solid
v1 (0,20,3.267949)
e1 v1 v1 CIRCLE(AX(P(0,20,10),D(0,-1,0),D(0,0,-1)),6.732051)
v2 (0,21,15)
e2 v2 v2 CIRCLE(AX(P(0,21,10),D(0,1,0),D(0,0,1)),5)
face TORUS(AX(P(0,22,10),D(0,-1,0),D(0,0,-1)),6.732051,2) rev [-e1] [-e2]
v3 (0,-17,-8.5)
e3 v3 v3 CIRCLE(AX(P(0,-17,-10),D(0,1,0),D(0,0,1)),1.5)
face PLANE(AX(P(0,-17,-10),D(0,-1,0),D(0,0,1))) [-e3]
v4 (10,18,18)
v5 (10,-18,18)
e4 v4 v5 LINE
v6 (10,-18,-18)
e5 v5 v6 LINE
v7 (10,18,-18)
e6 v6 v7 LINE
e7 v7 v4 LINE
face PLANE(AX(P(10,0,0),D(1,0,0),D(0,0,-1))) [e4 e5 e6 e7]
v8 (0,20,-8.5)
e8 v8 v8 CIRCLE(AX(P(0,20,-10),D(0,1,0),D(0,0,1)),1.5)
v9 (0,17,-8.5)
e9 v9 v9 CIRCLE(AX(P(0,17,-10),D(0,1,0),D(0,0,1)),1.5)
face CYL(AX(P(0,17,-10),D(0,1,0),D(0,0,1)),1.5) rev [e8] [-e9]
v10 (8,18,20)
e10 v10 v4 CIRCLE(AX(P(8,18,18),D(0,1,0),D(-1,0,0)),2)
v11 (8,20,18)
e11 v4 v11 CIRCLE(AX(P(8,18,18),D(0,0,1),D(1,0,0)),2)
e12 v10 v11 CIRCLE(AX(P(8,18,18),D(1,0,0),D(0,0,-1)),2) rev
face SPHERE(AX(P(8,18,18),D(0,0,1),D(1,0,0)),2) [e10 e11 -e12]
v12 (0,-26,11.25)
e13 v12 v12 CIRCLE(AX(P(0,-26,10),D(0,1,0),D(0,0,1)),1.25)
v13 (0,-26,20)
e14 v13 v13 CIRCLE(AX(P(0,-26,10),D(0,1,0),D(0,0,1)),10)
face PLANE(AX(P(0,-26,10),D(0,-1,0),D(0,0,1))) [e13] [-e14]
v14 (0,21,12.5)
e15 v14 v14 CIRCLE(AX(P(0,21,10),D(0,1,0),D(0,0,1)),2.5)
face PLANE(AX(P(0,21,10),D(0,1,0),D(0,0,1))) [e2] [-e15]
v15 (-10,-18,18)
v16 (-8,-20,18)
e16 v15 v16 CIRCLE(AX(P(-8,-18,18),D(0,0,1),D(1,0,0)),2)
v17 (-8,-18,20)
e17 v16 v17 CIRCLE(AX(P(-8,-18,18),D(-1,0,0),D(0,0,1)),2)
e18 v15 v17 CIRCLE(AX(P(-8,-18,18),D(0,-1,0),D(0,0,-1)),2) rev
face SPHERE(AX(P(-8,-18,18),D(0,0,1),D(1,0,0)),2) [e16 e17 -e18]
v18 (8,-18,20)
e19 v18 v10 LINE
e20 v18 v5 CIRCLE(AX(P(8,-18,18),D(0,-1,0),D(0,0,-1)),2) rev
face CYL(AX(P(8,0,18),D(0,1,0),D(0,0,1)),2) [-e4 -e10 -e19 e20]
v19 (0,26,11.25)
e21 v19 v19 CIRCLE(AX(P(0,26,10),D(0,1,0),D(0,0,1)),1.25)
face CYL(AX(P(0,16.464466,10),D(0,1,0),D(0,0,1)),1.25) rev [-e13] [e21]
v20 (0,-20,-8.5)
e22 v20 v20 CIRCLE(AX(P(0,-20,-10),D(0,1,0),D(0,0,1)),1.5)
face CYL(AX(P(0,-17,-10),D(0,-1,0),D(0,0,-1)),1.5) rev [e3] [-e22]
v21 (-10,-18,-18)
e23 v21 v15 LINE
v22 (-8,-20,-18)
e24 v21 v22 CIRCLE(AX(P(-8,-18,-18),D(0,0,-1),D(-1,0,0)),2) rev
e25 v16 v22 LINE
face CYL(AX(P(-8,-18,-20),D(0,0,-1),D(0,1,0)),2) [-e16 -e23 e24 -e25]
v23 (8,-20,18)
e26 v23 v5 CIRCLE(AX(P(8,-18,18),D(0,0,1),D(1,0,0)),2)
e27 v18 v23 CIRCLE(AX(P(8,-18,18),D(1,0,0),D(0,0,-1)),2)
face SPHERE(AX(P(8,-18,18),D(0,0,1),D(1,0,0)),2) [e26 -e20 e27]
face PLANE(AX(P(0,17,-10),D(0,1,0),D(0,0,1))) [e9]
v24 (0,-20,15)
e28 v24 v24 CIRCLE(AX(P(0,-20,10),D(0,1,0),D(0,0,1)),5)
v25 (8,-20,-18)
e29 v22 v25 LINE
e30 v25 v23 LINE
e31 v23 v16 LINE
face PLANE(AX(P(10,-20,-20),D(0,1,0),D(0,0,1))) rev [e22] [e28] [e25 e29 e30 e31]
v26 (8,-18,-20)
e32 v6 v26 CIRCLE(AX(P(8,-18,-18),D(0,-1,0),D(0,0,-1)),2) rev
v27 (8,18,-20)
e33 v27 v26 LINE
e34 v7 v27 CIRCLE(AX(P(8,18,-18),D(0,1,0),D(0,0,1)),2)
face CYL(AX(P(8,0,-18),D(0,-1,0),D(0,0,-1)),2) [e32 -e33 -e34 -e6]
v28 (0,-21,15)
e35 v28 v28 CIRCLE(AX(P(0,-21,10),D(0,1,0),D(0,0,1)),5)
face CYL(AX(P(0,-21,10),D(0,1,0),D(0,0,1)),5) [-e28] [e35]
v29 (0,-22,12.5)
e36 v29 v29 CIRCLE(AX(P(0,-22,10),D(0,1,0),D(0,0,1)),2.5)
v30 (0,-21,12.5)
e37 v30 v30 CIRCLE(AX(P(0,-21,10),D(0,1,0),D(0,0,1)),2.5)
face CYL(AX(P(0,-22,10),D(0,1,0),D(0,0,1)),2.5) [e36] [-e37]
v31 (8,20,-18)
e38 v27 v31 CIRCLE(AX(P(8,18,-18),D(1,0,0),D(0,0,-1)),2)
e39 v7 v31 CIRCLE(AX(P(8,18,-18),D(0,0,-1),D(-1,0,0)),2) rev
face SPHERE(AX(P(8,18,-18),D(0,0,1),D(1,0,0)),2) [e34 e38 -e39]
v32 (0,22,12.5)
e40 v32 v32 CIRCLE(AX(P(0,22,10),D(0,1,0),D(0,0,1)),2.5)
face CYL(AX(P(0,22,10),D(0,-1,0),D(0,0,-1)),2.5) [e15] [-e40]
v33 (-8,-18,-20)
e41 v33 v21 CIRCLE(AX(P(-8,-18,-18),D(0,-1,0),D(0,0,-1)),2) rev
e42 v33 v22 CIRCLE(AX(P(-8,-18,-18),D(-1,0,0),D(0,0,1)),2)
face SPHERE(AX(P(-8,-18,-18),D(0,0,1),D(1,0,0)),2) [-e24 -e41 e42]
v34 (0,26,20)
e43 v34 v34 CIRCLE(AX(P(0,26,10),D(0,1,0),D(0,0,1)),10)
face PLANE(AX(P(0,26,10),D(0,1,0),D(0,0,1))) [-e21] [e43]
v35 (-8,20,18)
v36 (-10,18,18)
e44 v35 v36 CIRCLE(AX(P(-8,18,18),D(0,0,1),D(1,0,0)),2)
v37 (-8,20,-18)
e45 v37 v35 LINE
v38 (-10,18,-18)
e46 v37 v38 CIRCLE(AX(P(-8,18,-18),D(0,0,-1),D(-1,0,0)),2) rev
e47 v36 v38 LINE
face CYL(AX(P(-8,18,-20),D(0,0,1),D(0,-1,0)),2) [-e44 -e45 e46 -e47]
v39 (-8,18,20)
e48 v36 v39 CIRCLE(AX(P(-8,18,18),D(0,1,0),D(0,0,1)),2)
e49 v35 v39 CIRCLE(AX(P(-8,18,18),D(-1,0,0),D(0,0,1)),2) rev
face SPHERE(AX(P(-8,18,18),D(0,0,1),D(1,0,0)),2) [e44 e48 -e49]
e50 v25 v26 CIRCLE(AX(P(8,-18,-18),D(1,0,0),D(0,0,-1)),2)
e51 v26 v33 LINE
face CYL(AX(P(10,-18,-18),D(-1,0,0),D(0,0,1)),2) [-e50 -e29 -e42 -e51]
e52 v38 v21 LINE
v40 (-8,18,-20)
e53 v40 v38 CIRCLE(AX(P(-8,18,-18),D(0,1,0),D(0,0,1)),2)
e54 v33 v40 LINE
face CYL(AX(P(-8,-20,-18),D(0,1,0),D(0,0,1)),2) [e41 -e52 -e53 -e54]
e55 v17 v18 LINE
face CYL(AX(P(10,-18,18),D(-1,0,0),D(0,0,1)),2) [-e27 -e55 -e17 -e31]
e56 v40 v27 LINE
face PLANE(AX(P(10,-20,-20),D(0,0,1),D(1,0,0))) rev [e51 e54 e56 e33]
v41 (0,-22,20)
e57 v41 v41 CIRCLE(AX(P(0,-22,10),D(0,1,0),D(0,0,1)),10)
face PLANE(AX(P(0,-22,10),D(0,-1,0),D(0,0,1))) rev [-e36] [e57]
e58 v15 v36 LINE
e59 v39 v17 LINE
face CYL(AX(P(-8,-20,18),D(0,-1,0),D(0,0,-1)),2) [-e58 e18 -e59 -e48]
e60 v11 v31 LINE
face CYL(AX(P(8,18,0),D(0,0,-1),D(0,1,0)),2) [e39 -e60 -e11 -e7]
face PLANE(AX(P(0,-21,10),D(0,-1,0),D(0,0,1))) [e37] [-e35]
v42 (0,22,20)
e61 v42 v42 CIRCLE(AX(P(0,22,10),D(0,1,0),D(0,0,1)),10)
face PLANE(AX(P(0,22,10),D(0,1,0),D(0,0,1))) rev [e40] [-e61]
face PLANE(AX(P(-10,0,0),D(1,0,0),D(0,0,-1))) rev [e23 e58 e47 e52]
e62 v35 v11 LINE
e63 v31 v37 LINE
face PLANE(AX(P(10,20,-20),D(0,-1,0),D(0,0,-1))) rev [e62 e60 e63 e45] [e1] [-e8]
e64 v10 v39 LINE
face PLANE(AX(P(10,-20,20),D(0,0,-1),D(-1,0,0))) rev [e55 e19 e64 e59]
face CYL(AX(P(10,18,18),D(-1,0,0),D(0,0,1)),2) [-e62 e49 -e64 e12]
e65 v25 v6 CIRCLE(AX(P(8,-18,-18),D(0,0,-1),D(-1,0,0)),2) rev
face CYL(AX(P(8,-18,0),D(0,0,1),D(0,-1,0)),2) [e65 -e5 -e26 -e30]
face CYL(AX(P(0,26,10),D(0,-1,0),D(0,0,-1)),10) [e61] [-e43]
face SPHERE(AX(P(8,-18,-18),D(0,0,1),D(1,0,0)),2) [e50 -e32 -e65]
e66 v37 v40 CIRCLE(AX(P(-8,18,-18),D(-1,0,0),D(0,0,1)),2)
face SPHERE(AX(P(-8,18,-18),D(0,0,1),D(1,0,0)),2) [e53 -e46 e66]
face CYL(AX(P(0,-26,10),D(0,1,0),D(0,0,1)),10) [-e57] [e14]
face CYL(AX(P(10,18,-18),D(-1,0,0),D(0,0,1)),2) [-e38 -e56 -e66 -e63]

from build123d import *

# Parameters (mm, degrees)
SKETCH_1_W          = 40
SKETCH_1_H          = 40
EXTRUDE_1_DEPTH     = 10
SKETCH_2_R          = 5
EXTRUDE_2_DEPTH     = 1
SKETCH_3_R          = 2.5
EXTRUDE_3_DEPTH     = 1
SKETCH_4_R          = 10
EXTRUDE_4_DEPTH     = 4
CUT_EXTRUDE_START   = -46
SKETCH_5_R          = 1.25
CUT_EXTRUDE_1_DEPTH = 46
FILLET_1_R          = 2
SKETCH_6_R          = 1.5
CUT_EXTRUDE_2_DEPTH = 3


with BuildPart() as part:
    # 草图1 → 凸台-拉伸1 (new, symmetric)
    with BuildSketch(Plane(origin=(0, 0, 0), x_dir=(0, 0, -1), z_dir=(1, 0, 0))):
        Rectangle(SKETCH_1_W, SKETCH_1_H)
    extrude(amount=EXTRUDE_1_DEPTH, both=True)

    # 草图2 → 凸台-拉伸2 (add)
    with BuildSketch(Plane(origin=(0, 20, 0), x_dir=(1, 0, 0), z_dir=(0, 1, 0))):
        with Locations(Location((0, -10, 0), (0, 0, 90))):
            Circle(SKETCH_2_R)
    extrude_2 = extrude(amount=EXTRUDE_2_DEPTH)

    # 草图3 → 凸台-拉伸3 (add)
    with BuildSketch(Plane(origin=(0, 21, 0), x_dir=(1, 0, 0), z_dir=(0, 1, 0))):
        with Locations(Location((0, -10, 0), (0, 0, 270))):
            Circle(SKETCH_3_R)
    extrude_3 = extrude(amount=EXTRUDE_3_DEPTH)

    # 草图4 → 凸台-拉伸4 (add)
    with BuildSketch(Plane(origin=(0, 22, 0), x_dir=(1, 0, 0), z_dir=(0, 1, 0))):
        with Locations(Location((0, -10, 0), (0, 0, 270))):
            Circle(SKETCH_4_R)
    extrude_4 = extrude(amount=EXTRUDE_4_DEPTH)

    # 草图5 → 切除-拉伸1 (cut)
    with BuildSketch(Plane(origin=(0, 26, 0), x_dir=(1, 0, 0), z_dir=(0, 1, 0)).offset(CUT_EXTRUDE_START)):
        with Locations(Location((0, -10, 0), (0, 0, 270))):
            Circle(SKETCH_5_R)
    cut_extrude_1 = extrude(amount=CUT_EXTRUDE_1_DEPTH, mode=Mode.SUBTRACT)

    # 镜向1: 凸台-拉伸2, 凸台-拉伸3, 凸台-拉伸4, 切除-拉伸1 across plane
    add(extrude_2.mirror(Plane.ZX))
    add(extrude_3.mirror(Plane.ZX))
    add(extrude_4.mirror(Plane.ZX))
    add(cut_extrude_1.mirror(Plane.ZX), mode=Mode.SUBTRACT)

    # 圆角1
    # the kernel refuses this fillet: 2 mm, written as the material it adds along each edge
    with BuildSketch(Plane(origin=(0, 20, 10), x_dir=(0, 0, -1), z_dir=(1, 0, 0))) as fillet_1_piece_1:
        with BuildLine():
            CenterArc((6.732050808, 2), FILLET_1_R, 210, 60)
            Line((6.732050808, 0), (5, 0))
            Line((5, 0), (5, 1))
        make_face()
    revolve(axis=Axis((0, 20, 10), (0, 1, 0)))
    # the kernel refuses this fillet: 2 mm, written as the material it takes off along each edge
    with BuildSketch(Plane(origin=(8, 18, -18), x_dir=(0, 0, -1), z_dir=(0, 1, 0))) as fillet_1_2_piece_1_section:
        Polygon((0, 0), (FILLET_1_R * 1.02, 0), (FILLET_1_R * 1.02, -FILLET_1_R * 1.02), (0, -FILLET_1_R * 1.02), align=None)
    fillet_1_2_piece_1 = extrude(amount=FILLET_1_R * 1.02, mode=Mode.PRIVATE)
    fillet_1_2_piece_1 = fillet_1_2_piece_1 - Plane(origin=(8, 18, -18), x_dir=(-0.7071067811865475, 0, 0.7071067811865475), z_dir=(0, 1, 0)) * Sphere(FILLET_1_R, mode=Mode.PRIVATE)
    add(fillet_1_2_piece_1, mode=Mode.SUBTRACT)
    with BuildSketch(Plane(origin=(8, -18, -18), x_dir=(0, 0, -1), z_dir=(0, -1, 0))) as fillet_1_2_piece_2_section:
        Polygon((0, 0), (FILLET_1_R * 1.02, 0), (FILLET_1_R * 1.02, FILLET_1_R * 1.02), (0, FILLET_1_R * 1.02), align=None)
    fillet_1_2_piece_2 = extrude(amount=FILLET_1_R * 1.02, mode=Mode.PRIVATE)
    fillet_1_2_piece_2 = fillet_1_2_piece_2 - Plane(origin=(8, -18, -18), x_dir=(-0.7071067811865475, 0, 0.7071067811865475), z_dir=(0, -1, 0)) * Sphere(FILLET_1_R, mode=Mode.PRIVATE)
    add(fillet_1_2_piece_2, mode=Mode.SUBTRACT)
    with BuildSketch(Plane(origin=(8, 18, 18), x_dir=(1, 0, 0), z_dir=(0, 1, 0))) as fillet_1_2_piece_3_section:
        Polygon((0, 0), (FILLET_1_R * 1.02, 0), (FILLET_1_R * 1.02, -FILLET_1_R * 1.02), (0, -FILLET_1_R * 1.02), align=None)
    fillet_1_2_piece_3 = extrude(amount=FILLET_1_R * 1.02, mode=Mode.PRIVATE)
    fillet_1_2_piece_3 = fillet_1_2_piece_3 - Plane(origin=(8, 18, 18), x_dir=(-0.7071067811865475, 0, -0.7071067811865475), z_dir=(0, 1, 0)) * Sphere(FILLET_1_R, mode=Mode.PRIVATE)
    add(fillet_1_2_piece_3, mode=Mode.SUBTRACT)
    with BuildSketch(Plane(origin=(8, -18, 18), x_dir=(1, 0, 0), z_dir=(0, -1, 0))) as fillet_1_2_piece_4_section:
        Polygon((0, 0), (FILLET_1_R * 1.02, 0), (FILLET_1_R * 1.02, FILLET_1_R * 1.02), (0, FILLET_1_R * 1.02), align=None)
    fillet_1_2_piece_4 = extrude(amount=FILLET_1_R * 1.02, mode=Mode.PRIVATE)
    fillet_1_2_piece_4 = fillet_1_2_piece_4 - Plane(origin=(8, -18, 18), x_dir=(-0.7071067811865475, 0, -0.7071067811865475), z_dir=(0, -1, 0)) * Sphere(FILLET_1_R, mode=Mode.PRIVATE)
    add(fillet_1_2_piece_4, mode=Mode.SUBTRACT)
    with BuildSketch(Plane(origin=(-8, 18, 18), x_dir=(-1, 0, 0), z_dir=(0, 1, 0))) as fillet_1_2_piece_5_section:
        Polygon((0, 0), (FILLET_1_R * 1.02, 0), (FILLET_1_R * 1.02, FILLET_1_R * 1.02), (0, FILLET_1_R * 1.02), align=None)
    fillet_1_2_piece_5 = extrude(amount=FILLET_1_R * 1.02, mode=Mode.PRIVATE)
    fillet_1_2_piece_5 = fillet_1_2_piece_5 - Plane(origin=(-8, 18, 18), x_dir=(0.7071067811865475, 0, -0.7071067811865475), z_dir=(0, 1, 0)) * Sphere(FILLET_1_R, mode=Mode.PRIVATE)
    add(fillet_1_2_piece_5, mode=Mode.SUBTRACT)
    with BuildSketch(Plane(origin=(-8, 18, -18), x_dir=(0, 0, -1), z_dir=(0, 1, 0))) as fillet_1_2_piece_6_section:
        Polygon((0, 0), (FILLET_1_R * 1.02, 0), (FILLET_1_R * 1.02, FILLET_1_R * 1.02), (0, FILLET_1_R * 1.02), align=None)
    fillet_1_2_piece_6 = extrude(amount=FILLET_1_R * 1.02, mode=Mode.PRIVATE)
    fillet_1_2_piece_6 = fillet_1_2_piece_6 - Plane(origin=(-8, 18, -18), x_dir=(0.7071067811865475, 0, 0.7071067811865475), z_dir=(0, 1, 0)) * Sphere(FILLET_1_R, mode=Mode.PRIVATE)
    add(fillet_1_2_piece_6, mode=Mode.SUBTRACT)
    with BuildSketch(Plane(origin=(-8, -18, -18), x_dir=(0, 0, -1), z_dir=(0, -1, 0))) as fillet_1_2_piece_7_section:
        Polygon((0, 0), (FILLET_1_R * 1.02, 0), (FILLET_1_R * 1.02, -FILLET_1_R * 1.02), (0, -FILLET_1_R * 1.02), align=None)
    fillet_1_2_piece_7 = extrude(amount=FILLET_1_R * 1.02, mode=Mode.PRIVATE)
    fillet_1_2_piece_7 = fillet_1_2_piece_7 - Plane(origin=(-8, -18, -18), x_dir=(0.7071067811865475, 0, 0.7071067811865475), z_dir=(0, -1, 0)) * Sphere(FILLET_1_R, mode=Mode.PRIVATE)
    add(fillet_1_2_piece_7, mode=Mode.SUBTRACT)
    with BuildSketch(Plane(origin=(-8, -18, 18), x_dir=(-1, 0, 0), z_dir=(0, -1, 0))) as fillet_1_2_piece_8_section:
        Polygon((0, 0), (FILLET_1_R * 1.02, 0), (FILLET_1_R * 1.02, -FILLET_1_R * 1.02), (0, -FILLET_1_R * 1.02), align=None)
    fillet_1_2_piece_8 = extrude(amount=FILLET_1_R * 1.02, mode=Mode.PRIVATE)
    fillet_1_2_piece_8 = fillet_1_2_piece_8 - Plane(origin=(-8, -18, 18), x_dir=(0.7071067811865475, 0, -0.7071067811865475), z_dir=(0, -1, 0)) * Sphere(FILLET_1_R, mode=Mode.PRIVATE)
    add(fillet_1_2_piece_8, mode=Mode.SUBTRACT)
    with BuildSketch(Plane(origin=(10, 18, -20), x_dir=(-1, 0, 0), z_dir=(0, -1, 0)), Plane(origin=(-10, 20, 18), x_dir=(0, -1, 0), z_dir=(0, 0, -1)), Plane(origin=(-10, -18, 20), x_dir=(0, 0, -1), z_dir=(0, 1, 0)), Plane(origin=(10, -20, -18), x_dir=(-1, 0, 0), z_dir=(0, 0, 1))) as fillet_1_2_piece_9:
        with BuildLine():
            CenterArc((FILLET_1_R, -FILLET_1_R), FILLET_1_R, 90, 90)
            Line((0, -FILLET_1_R), (0, 0))
            Line((0, 0), (FILLET_1_R, 0))
        make_face()
    extrude(amount=36, mode=Mode.SUBTRACT)
    with BuildSketch(Plane(origin=(10, 20, 18), x_dir=(0, -1, 0), z_dir=(0, 0, -1)), Plane(origin=(10, -18, 20), x_dir=(0, 0, -1), z_dir=(0, 1, 0)), Plane(origin=(-10, 18, -20), x_dir=(1, 0, 0), z_dir=(0, -1, 0)), Plane(origin=(-10, -20, -18), x_dir=(1, 0, 0), z_dir=(0, 0, 1))) as fillet_1_2_piece_10:
        with BuildLine():
            CenterArc((FILLET_1_R, FILLET_1_R), FILLET_1_R, 180, 90)
            Line((0, FILLET_1_R), (0, 0))
            Line((0, 0), (FILLET_1_R, 0))
        make_face()
    extrude(amount=36, mode=Mode.SUBTRACT)
    with BuildSketch(Plane(origin=(8, 20, 20), x_dir=(0, -1, 0), z_dir=(-1, 0, 0)), Plane(origin=(-8, 20, -20), x_dir=(0, -1, 0), z_dir=(1, 0, 0)), Plane(origin=(-8, -20, -20), x_dir=(0, 0, 1), z_dir=(1, 0, 0)), Plane(origin=(8, -20, 20), x_dir=(0, 0, -1), z_dir=(-1, 0, 0))) as fillet_1_2_piece_11:
        with BuildLine():
            CenterArc((FILLET_1_R, -FILLET_1_R), FILLET_1_R, 90, 90)
            Line((0, -FILLET_1_R), (0, 0))
            Line((0, 0), (FILLET_1_R, 0))
        make_face()
    extrude(amount=16, mode=Mode.SUBTRACT)

    # 草图6 → 切除-拉伸2 (cut)
    with BuildSketch(Plane(origin=(0, 20, 0), x_dir=(1, 0, 0), z_dir=(0, 1, 0))):
        with Locations(Location((0, 10, 0), (0, 0, 270))):
            Circle(SKETCH_6_R)
    cut_extrude_2 = extrude(amount=-CUT_EXTRUDE_2_DEPTH, mode=Mode.SUBTRACT)

    # 镜向2: 切除-拉伸2 across plane
    add(cut_extrude_2.mirror(Plane.ZX), mode=Mode.SUBTRACT)


solid = part.part
